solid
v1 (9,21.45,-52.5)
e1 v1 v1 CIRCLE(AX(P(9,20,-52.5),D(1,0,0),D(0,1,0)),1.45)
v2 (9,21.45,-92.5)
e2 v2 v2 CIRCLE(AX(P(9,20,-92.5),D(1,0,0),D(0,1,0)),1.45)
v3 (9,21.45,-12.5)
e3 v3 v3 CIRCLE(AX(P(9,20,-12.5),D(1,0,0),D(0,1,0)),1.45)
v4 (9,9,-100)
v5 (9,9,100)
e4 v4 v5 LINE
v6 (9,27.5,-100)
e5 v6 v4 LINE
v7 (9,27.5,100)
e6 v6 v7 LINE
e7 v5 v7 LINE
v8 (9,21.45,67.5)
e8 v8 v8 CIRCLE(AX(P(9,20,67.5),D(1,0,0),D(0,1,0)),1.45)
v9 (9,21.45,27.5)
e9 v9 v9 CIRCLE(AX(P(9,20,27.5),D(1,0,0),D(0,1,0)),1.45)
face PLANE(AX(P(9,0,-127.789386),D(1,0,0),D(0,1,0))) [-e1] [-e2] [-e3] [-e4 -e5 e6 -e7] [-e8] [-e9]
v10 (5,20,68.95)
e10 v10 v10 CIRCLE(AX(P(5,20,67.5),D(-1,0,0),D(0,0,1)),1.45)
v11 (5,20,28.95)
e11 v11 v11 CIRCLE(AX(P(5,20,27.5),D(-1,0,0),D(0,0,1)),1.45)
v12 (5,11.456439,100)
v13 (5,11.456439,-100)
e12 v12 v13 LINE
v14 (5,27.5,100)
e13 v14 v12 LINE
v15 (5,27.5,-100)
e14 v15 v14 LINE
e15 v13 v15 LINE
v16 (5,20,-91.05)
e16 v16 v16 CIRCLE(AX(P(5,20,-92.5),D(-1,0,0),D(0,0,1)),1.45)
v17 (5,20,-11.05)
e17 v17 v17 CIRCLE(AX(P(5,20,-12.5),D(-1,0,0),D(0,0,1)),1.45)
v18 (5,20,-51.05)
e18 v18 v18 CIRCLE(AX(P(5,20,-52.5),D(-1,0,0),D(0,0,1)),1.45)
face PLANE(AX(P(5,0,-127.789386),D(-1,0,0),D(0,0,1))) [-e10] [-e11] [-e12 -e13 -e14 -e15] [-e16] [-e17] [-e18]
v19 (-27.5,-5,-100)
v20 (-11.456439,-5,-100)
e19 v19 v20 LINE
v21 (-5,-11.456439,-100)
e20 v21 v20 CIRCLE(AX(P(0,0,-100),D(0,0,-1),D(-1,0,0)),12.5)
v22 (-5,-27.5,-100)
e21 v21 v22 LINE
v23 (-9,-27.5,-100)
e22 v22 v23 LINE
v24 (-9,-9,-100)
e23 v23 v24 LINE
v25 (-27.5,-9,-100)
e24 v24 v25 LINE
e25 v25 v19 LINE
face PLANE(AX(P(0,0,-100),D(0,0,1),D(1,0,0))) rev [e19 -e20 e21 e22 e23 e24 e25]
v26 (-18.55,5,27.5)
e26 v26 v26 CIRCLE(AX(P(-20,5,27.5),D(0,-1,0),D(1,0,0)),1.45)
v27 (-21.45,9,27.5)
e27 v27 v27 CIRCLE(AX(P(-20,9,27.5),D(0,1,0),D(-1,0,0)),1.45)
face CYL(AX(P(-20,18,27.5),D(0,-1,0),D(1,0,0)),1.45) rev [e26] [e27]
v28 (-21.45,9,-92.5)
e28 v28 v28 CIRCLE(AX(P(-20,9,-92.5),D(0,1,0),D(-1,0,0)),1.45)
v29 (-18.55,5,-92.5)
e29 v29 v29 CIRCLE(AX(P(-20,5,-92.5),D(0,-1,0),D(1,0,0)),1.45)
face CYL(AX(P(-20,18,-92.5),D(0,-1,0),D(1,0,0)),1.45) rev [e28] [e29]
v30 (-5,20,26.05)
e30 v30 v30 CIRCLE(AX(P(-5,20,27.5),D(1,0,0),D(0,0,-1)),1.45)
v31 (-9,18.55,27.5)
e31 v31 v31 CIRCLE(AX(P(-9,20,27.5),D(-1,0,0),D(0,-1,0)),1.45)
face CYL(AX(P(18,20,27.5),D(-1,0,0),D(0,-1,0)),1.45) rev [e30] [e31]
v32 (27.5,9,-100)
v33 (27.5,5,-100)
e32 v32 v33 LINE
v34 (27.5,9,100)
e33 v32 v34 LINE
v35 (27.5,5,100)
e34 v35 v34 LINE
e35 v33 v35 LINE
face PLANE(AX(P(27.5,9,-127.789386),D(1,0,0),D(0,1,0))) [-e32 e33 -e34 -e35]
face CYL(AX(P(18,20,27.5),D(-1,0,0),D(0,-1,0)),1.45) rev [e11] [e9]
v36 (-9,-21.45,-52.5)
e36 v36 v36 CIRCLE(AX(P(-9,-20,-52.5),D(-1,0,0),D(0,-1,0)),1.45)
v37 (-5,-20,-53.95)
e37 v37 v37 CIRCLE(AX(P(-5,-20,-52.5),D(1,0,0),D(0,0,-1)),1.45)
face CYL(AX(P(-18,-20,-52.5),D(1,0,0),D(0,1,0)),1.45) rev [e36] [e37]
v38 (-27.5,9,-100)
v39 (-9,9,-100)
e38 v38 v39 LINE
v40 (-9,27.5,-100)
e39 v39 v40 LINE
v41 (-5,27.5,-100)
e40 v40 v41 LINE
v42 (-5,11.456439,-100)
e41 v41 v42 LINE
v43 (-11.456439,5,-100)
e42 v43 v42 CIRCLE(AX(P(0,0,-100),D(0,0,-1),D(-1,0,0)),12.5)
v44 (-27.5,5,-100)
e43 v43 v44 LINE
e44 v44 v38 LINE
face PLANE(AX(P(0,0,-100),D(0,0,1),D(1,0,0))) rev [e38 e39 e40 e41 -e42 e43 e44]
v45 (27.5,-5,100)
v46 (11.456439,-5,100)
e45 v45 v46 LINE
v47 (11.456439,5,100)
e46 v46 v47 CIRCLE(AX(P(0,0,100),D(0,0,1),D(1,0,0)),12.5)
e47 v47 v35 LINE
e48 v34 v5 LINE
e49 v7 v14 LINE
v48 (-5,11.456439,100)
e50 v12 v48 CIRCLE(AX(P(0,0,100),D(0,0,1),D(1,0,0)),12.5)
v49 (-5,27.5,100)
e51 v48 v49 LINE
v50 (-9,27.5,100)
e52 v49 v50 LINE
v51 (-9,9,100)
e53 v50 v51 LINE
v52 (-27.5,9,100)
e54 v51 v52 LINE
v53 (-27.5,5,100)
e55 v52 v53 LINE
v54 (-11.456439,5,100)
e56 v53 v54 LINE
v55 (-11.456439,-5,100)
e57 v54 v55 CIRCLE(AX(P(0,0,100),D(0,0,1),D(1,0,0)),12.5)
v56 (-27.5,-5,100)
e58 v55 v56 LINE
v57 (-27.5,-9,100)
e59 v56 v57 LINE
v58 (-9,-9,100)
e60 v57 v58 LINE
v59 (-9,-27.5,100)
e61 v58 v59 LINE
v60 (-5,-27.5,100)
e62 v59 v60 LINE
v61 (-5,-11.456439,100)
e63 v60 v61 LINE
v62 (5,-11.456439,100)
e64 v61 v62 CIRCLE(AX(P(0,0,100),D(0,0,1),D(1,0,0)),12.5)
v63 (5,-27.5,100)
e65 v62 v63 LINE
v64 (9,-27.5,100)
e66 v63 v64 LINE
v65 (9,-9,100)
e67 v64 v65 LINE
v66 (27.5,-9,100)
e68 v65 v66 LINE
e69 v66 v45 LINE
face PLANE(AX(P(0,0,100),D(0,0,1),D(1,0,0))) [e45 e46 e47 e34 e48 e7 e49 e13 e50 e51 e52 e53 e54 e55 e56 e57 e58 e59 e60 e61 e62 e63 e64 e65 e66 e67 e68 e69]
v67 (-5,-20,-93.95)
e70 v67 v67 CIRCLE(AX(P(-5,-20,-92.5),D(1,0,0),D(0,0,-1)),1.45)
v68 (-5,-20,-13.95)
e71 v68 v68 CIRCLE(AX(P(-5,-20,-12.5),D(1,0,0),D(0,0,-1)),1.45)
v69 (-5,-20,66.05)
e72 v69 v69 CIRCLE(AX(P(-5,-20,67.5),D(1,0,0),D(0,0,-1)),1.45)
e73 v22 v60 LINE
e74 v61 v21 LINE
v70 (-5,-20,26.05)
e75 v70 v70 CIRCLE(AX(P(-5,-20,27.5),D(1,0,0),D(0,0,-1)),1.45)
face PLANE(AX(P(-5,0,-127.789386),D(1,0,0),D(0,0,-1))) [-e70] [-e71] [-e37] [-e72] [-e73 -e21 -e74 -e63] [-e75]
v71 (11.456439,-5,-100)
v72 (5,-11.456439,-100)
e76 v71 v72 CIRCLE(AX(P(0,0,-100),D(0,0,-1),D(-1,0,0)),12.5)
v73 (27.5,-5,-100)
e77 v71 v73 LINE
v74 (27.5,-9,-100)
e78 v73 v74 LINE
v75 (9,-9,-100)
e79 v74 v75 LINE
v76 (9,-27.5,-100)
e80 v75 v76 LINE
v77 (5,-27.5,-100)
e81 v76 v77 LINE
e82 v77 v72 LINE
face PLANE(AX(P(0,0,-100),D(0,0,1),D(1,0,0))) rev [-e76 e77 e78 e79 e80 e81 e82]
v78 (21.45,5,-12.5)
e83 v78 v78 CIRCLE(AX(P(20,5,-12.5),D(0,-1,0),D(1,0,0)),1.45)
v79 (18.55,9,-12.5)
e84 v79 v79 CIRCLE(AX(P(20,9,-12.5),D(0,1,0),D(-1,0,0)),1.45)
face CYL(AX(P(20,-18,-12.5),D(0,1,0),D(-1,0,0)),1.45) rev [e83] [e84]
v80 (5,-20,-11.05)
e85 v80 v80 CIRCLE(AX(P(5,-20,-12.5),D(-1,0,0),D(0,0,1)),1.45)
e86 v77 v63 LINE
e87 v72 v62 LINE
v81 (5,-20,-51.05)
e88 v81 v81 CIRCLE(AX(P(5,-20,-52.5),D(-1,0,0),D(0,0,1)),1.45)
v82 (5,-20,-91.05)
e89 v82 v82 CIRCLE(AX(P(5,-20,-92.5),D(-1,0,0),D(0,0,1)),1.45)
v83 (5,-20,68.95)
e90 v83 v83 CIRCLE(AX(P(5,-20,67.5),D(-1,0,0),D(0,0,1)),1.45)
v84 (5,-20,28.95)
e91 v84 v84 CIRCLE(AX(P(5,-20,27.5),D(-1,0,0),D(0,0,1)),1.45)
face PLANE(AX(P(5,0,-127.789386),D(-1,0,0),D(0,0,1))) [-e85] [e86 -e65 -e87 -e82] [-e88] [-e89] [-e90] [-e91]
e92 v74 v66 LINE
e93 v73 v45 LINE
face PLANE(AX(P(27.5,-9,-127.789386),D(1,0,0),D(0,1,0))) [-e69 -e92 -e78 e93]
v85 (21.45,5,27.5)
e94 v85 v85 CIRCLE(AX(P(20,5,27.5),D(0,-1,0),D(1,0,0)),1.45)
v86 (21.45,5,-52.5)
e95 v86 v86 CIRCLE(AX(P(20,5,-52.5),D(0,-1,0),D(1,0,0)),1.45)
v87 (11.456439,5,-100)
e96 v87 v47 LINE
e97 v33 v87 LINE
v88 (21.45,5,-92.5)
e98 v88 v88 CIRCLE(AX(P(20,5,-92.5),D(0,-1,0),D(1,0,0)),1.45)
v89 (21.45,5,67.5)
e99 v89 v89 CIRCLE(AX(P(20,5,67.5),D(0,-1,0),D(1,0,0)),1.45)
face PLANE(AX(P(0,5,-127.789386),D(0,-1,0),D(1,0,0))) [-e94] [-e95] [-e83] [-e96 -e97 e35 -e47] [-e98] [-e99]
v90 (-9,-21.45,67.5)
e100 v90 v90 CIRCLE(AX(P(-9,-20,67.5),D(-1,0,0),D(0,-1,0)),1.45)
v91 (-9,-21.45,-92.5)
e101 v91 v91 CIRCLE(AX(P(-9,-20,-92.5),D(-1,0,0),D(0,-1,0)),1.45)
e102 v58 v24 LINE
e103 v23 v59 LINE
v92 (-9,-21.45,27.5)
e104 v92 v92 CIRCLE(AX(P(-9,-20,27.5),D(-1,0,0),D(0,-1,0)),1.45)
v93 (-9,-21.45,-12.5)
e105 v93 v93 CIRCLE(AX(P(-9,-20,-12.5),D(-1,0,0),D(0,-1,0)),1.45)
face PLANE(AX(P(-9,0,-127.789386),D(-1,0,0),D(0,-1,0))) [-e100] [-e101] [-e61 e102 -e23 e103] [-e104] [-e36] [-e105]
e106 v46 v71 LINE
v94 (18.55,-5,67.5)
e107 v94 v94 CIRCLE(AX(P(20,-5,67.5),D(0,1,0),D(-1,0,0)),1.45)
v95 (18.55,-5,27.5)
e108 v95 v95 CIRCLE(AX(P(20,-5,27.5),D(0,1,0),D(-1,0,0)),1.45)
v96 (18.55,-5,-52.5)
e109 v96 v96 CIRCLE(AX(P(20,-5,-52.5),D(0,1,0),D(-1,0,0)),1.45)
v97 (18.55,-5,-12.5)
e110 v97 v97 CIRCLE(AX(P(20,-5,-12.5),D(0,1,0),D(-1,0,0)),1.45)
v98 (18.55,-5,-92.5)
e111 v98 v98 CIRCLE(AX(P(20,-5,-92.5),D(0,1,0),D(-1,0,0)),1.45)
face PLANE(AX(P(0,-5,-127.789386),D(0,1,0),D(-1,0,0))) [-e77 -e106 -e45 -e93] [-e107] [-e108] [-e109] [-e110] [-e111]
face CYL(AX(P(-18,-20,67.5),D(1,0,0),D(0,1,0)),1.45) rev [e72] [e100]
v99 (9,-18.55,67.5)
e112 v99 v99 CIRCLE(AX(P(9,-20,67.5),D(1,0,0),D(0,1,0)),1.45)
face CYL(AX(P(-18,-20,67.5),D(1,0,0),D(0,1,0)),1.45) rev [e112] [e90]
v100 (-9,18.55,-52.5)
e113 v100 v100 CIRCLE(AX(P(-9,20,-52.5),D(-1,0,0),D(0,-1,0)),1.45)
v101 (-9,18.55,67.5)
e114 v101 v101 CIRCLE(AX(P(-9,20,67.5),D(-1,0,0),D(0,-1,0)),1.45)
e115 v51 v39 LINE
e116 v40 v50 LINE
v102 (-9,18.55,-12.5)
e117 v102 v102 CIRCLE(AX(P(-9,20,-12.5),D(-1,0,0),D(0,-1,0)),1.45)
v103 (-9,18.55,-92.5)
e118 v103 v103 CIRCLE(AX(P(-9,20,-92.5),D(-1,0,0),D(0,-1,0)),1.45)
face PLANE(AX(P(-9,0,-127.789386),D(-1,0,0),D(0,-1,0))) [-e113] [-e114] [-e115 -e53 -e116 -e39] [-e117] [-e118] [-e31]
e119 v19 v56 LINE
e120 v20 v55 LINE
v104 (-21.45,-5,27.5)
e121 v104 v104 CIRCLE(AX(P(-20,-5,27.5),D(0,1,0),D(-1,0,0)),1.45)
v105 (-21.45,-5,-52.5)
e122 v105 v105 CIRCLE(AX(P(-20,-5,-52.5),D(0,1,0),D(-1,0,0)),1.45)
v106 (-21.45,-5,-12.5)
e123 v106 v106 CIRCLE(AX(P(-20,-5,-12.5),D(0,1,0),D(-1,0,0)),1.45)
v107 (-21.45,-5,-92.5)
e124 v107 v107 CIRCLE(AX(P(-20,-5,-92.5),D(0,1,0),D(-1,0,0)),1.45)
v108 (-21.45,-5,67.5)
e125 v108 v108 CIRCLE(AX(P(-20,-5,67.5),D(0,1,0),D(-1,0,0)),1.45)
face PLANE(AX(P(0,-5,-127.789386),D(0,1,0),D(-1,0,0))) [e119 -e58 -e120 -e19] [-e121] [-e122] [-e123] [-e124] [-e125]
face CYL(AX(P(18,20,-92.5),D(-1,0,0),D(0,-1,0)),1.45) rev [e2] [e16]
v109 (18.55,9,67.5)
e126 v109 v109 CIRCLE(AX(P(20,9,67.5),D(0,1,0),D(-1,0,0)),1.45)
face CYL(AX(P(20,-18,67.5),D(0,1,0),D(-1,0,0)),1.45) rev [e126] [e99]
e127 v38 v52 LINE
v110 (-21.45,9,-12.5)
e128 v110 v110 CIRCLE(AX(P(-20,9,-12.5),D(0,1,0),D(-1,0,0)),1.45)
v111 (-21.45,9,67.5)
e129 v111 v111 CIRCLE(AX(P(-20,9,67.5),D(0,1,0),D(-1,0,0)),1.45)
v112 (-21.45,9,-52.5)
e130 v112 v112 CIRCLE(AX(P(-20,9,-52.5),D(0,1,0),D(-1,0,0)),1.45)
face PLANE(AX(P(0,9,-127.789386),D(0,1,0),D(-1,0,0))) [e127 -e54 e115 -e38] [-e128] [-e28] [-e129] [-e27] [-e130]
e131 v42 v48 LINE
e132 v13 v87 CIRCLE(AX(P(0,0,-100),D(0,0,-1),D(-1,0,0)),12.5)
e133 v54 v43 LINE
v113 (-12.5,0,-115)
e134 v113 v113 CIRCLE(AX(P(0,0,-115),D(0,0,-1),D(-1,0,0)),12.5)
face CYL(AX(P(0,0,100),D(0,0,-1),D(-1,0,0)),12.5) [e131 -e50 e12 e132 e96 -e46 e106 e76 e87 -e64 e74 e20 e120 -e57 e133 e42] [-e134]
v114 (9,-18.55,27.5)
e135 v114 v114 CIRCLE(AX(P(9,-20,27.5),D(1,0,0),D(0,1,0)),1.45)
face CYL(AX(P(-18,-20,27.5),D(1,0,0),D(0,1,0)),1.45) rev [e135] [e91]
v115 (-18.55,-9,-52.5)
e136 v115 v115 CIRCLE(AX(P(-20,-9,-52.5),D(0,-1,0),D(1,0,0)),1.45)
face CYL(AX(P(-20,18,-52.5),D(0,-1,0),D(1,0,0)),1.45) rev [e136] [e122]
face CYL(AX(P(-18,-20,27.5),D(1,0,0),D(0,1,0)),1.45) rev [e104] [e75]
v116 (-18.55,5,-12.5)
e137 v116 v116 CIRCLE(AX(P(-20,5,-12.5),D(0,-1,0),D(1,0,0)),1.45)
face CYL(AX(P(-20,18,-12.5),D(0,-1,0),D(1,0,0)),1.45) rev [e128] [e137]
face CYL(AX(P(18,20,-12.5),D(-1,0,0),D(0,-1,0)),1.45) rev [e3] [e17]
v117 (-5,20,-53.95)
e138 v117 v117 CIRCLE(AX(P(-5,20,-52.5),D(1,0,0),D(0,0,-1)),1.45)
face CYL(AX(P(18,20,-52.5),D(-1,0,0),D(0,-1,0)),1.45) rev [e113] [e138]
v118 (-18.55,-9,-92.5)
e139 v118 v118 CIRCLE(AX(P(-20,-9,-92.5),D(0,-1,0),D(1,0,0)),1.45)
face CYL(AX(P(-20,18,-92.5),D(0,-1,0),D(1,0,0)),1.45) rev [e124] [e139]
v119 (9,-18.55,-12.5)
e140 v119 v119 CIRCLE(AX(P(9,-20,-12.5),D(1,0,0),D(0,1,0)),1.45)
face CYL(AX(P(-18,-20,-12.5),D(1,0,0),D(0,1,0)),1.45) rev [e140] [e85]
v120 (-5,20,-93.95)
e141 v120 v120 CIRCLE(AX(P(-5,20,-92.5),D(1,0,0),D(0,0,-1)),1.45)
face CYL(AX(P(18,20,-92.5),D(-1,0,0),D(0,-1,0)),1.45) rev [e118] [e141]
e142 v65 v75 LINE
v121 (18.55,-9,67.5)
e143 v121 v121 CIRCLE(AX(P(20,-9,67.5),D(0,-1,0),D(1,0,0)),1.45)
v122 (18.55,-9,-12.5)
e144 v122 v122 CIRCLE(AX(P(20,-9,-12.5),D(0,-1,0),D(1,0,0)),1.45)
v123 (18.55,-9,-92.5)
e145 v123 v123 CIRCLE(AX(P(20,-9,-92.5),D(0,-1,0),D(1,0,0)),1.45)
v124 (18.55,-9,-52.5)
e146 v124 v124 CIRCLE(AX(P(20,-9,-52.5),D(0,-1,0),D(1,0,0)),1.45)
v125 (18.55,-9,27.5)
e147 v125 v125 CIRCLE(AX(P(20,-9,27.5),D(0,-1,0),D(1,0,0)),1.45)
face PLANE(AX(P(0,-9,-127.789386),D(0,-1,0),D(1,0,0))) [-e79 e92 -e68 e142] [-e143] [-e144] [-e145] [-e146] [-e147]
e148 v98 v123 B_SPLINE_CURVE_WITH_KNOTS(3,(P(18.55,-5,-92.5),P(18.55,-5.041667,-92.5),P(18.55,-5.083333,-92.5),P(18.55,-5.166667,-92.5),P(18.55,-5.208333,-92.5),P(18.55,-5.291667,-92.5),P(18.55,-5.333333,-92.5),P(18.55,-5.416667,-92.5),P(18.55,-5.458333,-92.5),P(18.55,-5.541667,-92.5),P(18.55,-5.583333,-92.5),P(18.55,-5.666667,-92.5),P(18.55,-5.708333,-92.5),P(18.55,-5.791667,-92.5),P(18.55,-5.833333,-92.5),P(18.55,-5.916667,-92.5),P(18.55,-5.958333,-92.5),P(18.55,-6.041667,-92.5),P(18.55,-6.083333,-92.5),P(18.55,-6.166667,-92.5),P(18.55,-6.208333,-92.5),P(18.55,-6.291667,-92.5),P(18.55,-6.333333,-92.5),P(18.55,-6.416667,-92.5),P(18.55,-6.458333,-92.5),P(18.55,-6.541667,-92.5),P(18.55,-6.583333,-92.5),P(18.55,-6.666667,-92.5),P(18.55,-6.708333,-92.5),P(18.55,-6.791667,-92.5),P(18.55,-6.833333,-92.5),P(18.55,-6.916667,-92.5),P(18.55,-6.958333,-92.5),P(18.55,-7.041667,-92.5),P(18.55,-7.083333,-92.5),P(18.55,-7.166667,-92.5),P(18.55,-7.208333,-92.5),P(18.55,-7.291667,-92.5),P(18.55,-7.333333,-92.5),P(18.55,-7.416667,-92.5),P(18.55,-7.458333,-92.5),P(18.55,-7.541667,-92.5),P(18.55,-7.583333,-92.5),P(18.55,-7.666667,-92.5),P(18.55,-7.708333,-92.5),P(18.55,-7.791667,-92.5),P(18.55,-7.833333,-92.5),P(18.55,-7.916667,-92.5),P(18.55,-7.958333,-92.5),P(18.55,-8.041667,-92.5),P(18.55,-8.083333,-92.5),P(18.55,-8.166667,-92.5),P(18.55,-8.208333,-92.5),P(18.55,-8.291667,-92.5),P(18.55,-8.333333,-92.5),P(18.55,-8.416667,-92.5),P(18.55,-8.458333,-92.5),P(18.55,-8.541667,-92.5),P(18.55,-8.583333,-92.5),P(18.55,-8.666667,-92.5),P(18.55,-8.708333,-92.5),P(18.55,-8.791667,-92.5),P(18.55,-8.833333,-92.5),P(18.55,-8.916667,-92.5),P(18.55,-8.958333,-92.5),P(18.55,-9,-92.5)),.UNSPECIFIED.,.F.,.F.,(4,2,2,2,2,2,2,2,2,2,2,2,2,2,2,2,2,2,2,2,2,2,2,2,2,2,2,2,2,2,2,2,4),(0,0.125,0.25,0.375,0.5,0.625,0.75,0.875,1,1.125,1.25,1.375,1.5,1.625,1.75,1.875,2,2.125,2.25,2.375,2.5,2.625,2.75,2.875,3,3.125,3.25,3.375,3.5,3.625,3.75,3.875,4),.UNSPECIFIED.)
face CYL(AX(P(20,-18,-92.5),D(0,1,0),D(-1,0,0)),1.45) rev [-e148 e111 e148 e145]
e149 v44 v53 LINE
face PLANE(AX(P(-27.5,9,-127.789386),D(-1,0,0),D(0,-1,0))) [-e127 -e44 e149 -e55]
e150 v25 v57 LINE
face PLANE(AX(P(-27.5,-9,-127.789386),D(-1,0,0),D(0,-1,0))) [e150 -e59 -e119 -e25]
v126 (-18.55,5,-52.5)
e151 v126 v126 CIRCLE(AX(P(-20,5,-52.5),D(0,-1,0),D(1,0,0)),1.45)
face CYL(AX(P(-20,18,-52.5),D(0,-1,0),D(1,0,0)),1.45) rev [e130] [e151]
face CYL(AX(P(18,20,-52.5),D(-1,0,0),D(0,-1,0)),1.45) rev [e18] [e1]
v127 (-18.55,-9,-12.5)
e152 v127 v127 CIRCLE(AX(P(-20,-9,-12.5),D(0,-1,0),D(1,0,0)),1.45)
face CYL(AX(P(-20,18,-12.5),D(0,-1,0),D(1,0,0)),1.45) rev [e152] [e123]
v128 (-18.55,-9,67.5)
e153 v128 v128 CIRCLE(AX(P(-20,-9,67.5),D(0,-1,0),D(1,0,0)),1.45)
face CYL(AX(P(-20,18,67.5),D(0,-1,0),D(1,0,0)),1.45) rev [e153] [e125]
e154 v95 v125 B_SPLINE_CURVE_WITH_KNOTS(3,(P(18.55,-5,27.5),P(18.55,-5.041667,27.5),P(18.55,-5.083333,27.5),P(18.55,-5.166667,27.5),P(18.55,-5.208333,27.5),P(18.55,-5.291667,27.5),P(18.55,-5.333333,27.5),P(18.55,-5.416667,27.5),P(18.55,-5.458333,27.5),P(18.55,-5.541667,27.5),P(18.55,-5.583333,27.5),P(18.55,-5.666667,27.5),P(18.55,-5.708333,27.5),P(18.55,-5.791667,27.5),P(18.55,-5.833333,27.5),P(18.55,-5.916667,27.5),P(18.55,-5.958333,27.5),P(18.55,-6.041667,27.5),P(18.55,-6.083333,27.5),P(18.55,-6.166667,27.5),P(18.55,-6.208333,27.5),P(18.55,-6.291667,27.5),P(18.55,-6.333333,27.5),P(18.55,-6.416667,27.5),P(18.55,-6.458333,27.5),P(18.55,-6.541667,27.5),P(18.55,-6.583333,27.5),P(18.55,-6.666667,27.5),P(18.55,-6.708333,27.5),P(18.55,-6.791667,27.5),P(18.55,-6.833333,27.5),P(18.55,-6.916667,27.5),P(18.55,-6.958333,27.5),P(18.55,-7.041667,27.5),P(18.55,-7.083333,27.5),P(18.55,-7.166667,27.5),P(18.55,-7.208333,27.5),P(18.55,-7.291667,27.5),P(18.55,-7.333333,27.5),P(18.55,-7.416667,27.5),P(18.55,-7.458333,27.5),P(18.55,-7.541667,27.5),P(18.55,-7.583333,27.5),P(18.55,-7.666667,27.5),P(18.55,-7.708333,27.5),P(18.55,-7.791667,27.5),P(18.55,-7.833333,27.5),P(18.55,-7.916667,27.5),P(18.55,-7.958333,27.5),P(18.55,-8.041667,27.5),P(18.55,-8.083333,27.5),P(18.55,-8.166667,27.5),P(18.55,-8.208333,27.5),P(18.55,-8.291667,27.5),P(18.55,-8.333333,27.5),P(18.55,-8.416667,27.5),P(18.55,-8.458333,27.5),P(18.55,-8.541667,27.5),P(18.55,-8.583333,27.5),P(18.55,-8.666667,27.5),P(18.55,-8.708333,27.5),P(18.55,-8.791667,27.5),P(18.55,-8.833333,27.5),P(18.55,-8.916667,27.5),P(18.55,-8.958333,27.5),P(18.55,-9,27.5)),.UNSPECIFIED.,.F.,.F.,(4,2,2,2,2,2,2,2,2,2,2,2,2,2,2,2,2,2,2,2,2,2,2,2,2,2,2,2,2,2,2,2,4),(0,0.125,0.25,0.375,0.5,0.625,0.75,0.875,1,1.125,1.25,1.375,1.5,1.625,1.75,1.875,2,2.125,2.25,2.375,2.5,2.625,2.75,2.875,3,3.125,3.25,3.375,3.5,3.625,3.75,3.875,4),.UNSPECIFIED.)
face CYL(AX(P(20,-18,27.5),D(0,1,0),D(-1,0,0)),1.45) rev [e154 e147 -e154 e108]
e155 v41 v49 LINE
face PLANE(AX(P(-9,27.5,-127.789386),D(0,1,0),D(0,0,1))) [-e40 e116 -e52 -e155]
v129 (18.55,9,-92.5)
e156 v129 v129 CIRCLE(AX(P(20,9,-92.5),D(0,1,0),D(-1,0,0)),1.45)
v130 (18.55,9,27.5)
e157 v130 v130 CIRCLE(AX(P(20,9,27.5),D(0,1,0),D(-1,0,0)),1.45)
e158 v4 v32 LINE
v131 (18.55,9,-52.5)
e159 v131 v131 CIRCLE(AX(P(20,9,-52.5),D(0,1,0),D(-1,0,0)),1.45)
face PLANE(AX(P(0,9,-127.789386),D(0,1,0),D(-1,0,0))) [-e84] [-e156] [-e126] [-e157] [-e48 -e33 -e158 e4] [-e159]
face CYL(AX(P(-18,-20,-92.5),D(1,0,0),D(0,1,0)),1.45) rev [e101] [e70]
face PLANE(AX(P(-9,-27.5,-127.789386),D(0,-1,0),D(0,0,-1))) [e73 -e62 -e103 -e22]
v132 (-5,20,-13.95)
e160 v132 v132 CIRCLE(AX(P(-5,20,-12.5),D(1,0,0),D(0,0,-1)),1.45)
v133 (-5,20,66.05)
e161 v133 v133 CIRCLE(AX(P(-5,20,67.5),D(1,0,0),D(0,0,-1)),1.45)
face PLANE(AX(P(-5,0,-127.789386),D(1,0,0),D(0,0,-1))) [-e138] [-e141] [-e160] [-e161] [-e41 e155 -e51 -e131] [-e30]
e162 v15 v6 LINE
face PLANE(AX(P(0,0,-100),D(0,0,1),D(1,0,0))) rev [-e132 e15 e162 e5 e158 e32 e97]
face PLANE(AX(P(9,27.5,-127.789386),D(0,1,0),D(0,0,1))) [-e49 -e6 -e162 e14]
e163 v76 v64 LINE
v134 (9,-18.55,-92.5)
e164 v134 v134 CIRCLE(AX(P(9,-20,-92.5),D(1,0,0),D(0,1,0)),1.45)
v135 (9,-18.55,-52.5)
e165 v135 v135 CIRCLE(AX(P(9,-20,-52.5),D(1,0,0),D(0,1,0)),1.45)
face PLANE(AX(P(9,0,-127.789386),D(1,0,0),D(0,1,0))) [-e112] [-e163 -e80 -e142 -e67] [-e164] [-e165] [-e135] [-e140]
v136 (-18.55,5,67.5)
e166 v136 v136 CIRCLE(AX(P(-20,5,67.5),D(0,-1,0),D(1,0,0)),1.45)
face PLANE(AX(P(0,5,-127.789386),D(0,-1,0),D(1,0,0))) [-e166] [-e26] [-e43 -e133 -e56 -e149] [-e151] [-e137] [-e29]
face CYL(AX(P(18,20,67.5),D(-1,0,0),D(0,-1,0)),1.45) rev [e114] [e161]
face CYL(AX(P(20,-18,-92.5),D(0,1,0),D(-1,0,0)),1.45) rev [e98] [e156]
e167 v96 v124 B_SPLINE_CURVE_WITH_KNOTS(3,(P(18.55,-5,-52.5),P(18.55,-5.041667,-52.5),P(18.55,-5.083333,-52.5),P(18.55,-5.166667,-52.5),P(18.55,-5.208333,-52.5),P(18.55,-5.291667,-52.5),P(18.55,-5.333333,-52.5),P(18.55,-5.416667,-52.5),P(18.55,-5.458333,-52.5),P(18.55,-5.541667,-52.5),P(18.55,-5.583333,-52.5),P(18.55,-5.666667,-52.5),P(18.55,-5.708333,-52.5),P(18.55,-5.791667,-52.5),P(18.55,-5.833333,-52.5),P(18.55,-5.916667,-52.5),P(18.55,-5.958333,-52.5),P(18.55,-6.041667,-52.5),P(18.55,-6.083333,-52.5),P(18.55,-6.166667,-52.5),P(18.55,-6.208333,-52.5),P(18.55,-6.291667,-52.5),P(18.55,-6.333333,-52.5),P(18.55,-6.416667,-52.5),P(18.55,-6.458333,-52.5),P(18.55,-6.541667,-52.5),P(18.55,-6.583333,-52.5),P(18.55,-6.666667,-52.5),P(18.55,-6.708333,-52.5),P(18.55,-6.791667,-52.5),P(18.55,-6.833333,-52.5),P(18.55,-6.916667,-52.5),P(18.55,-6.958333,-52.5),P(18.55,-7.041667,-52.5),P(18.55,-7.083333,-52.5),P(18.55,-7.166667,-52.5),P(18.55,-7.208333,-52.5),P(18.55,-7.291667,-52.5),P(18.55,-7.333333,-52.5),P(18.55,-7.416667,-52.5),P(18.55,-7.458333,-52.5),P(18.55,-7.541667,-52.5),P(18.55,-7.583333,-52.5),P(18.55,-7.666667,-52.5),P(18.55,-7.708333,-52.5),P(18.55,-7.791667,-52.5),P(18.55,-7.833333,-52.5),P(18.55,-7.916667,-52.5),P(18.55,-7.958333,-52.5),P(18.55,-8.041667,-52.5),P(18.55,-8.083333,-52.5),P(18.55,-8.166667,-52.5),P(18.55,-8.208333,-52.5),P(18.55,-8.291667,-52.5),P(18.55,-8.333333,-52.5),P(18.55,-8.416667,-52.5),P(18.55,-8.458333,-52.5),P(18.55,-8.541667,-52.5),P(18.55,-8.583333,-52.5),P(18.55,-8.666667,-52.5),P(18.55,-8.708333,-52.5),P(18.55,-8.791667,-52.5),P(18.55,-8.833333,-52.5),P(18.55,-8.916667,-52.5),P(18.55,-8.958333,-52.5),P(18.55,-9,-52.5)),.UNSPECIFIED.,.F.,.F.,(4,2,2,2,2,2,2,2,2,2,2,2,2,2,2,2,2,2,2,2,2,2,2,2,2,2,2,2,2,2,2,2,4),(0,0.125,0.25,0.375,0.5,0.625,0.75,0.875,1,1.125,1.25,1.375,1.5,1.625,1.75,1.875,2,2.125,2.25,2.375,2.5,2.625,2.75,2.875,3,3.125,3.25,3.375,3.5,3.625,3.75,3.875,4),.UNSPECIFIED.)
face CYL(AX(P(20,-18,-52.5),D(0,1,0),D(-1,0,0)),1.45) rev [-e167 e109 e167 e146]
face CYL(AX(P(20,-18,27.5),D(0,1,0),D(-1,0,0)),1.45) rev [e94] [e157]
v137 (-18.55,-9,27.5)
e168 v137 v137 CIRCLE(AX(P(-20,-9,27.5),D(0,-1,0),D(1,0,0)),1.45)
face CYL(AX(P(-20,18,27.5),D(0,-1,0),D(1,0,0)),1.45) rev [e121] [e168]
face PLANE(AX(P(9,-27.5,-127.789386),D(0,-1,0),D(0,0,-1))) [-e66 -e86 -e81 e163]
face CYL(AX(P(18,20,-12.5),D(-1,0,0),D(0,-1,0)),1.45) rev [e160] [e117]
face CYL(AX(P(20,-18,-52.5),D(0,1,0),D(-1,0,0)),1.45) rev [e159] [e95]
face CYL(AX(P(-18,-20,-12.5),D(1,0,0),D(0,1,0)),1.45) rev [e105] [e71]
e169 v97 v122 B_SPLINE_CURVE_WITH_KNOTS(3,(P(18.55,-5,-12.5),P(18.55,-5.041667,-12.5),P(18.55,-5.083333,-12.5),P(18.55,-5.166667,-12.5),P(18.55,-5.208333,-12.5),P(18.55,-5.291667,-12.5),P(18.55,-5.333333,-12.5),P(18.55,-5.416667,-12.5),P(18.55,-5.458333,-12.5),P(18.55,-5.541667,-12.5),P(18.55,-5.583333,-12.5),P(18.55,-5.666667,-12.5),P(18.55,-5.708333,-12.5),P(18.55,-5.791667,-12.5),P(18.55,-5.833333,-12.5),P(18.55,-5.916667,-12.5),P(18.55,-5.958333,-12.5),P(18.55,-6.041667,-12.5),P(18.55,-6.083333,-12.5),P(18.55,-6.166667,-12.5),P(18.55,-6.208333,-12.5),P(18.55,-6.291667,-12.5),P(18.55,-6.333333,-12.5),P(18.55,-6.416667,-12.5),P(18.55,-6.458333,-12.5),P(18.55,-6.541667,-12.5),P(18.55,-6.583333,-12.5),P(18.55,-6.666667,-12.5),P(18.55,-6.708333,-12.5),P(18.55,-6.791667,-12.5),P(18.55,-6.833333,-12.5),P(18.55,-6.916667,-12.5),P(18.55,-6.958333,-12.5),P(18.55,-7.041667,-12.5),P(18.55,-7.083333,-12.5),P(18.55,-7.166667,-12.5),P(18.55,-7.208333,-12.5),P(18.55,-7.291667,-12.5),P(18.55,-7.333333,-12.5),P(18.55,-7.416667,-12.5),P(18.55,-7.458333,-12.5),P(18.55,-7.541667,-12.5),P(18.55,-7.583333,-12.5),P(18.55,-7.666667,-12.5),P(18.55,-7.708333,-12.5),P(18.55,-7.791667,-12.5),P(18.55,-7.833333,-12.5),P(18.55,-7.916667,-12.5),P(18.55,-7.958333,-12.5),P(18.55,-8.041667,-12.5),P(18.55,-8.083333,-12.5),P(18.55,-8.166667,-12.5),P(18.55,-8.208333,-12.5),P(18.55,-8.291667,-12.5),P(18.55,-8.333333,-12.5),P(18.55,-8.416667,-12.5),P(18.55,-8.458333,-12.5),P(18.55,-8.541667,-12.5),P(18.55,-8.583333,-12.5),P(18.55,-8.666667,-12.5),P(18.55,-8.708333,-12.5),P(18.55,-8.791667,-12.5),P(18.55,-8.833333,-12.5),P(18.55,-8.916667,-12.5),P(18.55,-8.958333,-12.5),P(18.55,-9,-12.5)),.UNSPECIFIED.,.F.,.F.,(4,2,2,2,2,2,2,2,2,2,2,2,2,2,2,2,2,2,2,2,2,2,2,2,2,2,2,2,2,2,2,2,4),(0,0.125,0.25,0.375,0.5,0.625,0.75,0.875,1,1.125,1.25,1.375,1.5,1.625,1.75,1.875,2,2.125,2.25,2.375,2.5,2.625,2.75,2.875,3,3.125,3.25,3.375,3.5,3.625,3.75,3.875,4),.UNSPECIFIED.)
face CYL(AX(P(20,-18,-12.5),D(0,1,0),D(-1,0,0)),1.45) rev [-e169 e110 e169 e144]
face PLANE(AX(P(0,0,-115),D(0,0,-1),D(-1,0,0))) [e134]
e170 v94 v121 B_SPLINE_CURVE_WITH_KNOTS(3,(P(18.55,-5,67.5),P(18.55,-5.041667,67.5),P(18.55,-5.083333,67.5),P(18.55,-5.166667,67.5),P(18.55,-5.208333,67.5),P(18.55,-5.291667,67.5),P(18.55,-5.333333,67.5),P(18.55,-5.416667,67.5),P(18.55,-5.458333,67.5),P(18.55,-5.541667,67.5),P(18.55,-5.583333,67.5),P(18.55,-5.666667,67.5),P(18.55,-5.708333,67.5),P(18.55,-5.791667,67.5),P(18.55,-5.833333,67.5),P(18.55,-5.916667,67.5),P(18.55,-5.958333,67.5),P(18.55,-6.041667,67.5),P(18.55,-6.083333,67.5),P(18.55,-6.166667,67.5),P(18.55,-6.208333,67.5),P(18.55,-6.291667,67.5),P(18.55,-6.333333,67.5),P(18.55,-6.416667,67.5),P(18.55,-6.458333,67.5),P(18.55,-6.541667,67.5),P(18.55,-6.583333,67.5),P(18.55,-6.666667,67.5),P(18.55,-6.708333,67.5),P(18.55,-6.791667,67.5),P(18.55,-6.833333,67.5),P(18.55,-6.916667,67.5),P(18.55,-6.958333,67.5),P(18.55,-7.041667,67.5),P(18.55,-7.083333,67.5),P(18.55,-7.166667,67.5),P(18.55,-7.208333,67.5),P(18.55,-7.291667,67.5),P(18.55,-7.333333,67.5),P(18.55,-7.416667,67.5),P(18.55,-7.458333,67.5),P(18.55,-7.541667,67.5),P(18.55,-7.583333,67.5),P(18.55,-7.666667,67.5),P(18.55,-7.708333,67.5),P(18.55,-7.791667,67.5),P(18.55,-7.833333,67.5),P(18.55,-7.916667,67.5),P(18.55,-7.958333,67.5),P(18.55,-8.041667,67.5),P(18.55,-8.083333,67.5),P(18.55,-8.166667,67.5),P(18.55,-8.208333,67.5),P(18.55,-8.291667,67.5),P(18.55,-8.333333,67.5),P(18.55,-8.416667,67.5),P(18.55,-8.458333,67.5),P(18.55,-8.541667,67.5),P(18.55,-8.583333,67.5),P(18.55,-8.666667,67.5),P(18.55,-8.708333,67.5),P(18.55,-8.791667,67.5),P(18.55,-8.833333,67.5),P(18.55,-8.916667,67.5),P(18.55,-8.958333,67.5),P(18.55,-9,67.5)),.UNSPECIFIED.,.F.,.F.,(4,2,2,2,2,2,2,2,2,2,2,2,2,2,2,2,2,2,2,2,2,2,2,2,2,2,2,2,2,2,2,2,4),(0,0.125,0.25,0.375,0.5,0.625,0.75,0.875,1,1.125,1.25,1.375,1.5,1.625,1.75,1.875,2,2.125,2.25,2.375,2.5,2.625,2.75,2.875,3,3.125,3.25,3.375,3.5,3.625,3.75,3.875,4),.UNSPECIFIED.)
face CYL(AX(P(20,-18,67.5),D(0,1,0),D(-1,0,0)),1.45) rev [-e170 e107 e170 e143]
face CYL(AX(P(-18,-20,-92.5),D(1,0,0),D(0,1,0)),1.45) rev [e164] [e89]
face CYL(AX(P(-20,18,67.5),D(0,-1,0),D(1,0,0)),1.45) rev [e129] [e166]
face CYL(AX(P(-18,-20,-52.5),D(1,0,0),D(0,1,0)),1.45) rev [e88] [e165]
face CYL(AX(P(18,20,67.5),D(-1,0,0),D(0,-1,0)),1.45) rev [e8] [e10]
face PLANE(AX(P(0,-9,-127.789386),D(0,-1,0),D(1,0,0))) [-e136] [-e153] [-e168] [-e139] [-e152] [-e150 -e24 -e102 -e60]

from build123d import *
from build123d.topology import SkipClean

# Parameters (mm, degrees)
SKETCH1_R           = 12.5
BOSS_EXTRUDE1_DEPTH = 100
SKETCH4_W           = 4
SKETCH4_H           = 27.5
BOSS_EXTRUDE3_DEPTH = 200
CIRPATTERN7_COUNT   = 4
SKETCH7_R           = 1.45
CUT_EXTRUDE2_DEPTH  = 27
CIRPATTERN9_COUNT   = 4
SKETCH10_R          = 12.5
BOSS_EXTRUDE4_DEPTH = 15


with BuildPart() as part:
    # Sketch1 → Boss-Extrude1 (new, symmetric)
    with BuildSketch(Plane.XY):
        Circle(SKETCH1_R)
    extrude(amount=BOSS_EXTRUDE1_DEPTH, both=True)

    # Sketch4 → Boss-Extrude3 (add)
    with BuildSketch(Plane.XY.offset(100)):
        with Locations((-7, 13.75)):
            Rectangle(SKETCH4_W, SKETCH4_H)
        with Locations((7, 13.75)):
            Rectangle(SKETCH4_W, SKETCH4_H)
    boss_extrude3 = extrude(amount=-BOSS_EXTRUDE3_DEPTH)

    # CirPattern7: Boss-Extrude3 ×4 about axis
    cirpattern7_axis = Axis((0, 0, 0), (0, 0, 1))
    for i in range(1, CIRPATTERN7_COUNT):
        add(boss_extrude3.rotate(cirpattern7_axis, i * 360 / CIRPATTERN7_COUNT))

    # Sketch7 → Cut-Extrude2 (cut)
    with BuildSketch(Plane.ZY.offset(9)):
        with Locations((-92.5, 20)):
            Circle(SKETCH7_R)
        with Locations((-52.5, 20)):
            Circle(SKETCH7_R)
        with Locations((-12.5, 20)):
            Circle(SKETCH7_R)
        with Locations((27.5, 20)):
            Circle(SKETCH7_R)
        with Locations((67.5, 20)):
            Circle(SKETCH7_R)
    cut_extrude2 = extrude(amount=-CUT_EXTRUDE2_DEPTH, mode=Mode.SUBTRACT)

    # CirPattern9: Cut-Extrude2 ×4 about axis
    cirpattern9_axis = Axis((0, 0, 100), (0, 0, 1))
    for i in range(1, CIRPATTERN9_COUNT):
        add(cut_extrude2.rotate(cirpattern9_axis, i * 360 / CIRPATTERN9_COUNT), mode=Mode.SUBTRACT)

    # Sketch10 → Boss-Extrude4 (add)
    with SkipClean():  # the faces are left unmerged after this step: merging them gives an invalid solid
        with BuildSketch(Plane(origin=(0, 0, -100), x_dir=(-1, 0, 0), z_dir=(0, 0, -1))):
            Circle(SKETCH10_R)
        extrude(amount=BOSS_EXTRUDE4_DEPTH)
    add(part.part.scale(1), mode=Mode.REPLACE)  # the faces are merged on a copy


solid = part.part
